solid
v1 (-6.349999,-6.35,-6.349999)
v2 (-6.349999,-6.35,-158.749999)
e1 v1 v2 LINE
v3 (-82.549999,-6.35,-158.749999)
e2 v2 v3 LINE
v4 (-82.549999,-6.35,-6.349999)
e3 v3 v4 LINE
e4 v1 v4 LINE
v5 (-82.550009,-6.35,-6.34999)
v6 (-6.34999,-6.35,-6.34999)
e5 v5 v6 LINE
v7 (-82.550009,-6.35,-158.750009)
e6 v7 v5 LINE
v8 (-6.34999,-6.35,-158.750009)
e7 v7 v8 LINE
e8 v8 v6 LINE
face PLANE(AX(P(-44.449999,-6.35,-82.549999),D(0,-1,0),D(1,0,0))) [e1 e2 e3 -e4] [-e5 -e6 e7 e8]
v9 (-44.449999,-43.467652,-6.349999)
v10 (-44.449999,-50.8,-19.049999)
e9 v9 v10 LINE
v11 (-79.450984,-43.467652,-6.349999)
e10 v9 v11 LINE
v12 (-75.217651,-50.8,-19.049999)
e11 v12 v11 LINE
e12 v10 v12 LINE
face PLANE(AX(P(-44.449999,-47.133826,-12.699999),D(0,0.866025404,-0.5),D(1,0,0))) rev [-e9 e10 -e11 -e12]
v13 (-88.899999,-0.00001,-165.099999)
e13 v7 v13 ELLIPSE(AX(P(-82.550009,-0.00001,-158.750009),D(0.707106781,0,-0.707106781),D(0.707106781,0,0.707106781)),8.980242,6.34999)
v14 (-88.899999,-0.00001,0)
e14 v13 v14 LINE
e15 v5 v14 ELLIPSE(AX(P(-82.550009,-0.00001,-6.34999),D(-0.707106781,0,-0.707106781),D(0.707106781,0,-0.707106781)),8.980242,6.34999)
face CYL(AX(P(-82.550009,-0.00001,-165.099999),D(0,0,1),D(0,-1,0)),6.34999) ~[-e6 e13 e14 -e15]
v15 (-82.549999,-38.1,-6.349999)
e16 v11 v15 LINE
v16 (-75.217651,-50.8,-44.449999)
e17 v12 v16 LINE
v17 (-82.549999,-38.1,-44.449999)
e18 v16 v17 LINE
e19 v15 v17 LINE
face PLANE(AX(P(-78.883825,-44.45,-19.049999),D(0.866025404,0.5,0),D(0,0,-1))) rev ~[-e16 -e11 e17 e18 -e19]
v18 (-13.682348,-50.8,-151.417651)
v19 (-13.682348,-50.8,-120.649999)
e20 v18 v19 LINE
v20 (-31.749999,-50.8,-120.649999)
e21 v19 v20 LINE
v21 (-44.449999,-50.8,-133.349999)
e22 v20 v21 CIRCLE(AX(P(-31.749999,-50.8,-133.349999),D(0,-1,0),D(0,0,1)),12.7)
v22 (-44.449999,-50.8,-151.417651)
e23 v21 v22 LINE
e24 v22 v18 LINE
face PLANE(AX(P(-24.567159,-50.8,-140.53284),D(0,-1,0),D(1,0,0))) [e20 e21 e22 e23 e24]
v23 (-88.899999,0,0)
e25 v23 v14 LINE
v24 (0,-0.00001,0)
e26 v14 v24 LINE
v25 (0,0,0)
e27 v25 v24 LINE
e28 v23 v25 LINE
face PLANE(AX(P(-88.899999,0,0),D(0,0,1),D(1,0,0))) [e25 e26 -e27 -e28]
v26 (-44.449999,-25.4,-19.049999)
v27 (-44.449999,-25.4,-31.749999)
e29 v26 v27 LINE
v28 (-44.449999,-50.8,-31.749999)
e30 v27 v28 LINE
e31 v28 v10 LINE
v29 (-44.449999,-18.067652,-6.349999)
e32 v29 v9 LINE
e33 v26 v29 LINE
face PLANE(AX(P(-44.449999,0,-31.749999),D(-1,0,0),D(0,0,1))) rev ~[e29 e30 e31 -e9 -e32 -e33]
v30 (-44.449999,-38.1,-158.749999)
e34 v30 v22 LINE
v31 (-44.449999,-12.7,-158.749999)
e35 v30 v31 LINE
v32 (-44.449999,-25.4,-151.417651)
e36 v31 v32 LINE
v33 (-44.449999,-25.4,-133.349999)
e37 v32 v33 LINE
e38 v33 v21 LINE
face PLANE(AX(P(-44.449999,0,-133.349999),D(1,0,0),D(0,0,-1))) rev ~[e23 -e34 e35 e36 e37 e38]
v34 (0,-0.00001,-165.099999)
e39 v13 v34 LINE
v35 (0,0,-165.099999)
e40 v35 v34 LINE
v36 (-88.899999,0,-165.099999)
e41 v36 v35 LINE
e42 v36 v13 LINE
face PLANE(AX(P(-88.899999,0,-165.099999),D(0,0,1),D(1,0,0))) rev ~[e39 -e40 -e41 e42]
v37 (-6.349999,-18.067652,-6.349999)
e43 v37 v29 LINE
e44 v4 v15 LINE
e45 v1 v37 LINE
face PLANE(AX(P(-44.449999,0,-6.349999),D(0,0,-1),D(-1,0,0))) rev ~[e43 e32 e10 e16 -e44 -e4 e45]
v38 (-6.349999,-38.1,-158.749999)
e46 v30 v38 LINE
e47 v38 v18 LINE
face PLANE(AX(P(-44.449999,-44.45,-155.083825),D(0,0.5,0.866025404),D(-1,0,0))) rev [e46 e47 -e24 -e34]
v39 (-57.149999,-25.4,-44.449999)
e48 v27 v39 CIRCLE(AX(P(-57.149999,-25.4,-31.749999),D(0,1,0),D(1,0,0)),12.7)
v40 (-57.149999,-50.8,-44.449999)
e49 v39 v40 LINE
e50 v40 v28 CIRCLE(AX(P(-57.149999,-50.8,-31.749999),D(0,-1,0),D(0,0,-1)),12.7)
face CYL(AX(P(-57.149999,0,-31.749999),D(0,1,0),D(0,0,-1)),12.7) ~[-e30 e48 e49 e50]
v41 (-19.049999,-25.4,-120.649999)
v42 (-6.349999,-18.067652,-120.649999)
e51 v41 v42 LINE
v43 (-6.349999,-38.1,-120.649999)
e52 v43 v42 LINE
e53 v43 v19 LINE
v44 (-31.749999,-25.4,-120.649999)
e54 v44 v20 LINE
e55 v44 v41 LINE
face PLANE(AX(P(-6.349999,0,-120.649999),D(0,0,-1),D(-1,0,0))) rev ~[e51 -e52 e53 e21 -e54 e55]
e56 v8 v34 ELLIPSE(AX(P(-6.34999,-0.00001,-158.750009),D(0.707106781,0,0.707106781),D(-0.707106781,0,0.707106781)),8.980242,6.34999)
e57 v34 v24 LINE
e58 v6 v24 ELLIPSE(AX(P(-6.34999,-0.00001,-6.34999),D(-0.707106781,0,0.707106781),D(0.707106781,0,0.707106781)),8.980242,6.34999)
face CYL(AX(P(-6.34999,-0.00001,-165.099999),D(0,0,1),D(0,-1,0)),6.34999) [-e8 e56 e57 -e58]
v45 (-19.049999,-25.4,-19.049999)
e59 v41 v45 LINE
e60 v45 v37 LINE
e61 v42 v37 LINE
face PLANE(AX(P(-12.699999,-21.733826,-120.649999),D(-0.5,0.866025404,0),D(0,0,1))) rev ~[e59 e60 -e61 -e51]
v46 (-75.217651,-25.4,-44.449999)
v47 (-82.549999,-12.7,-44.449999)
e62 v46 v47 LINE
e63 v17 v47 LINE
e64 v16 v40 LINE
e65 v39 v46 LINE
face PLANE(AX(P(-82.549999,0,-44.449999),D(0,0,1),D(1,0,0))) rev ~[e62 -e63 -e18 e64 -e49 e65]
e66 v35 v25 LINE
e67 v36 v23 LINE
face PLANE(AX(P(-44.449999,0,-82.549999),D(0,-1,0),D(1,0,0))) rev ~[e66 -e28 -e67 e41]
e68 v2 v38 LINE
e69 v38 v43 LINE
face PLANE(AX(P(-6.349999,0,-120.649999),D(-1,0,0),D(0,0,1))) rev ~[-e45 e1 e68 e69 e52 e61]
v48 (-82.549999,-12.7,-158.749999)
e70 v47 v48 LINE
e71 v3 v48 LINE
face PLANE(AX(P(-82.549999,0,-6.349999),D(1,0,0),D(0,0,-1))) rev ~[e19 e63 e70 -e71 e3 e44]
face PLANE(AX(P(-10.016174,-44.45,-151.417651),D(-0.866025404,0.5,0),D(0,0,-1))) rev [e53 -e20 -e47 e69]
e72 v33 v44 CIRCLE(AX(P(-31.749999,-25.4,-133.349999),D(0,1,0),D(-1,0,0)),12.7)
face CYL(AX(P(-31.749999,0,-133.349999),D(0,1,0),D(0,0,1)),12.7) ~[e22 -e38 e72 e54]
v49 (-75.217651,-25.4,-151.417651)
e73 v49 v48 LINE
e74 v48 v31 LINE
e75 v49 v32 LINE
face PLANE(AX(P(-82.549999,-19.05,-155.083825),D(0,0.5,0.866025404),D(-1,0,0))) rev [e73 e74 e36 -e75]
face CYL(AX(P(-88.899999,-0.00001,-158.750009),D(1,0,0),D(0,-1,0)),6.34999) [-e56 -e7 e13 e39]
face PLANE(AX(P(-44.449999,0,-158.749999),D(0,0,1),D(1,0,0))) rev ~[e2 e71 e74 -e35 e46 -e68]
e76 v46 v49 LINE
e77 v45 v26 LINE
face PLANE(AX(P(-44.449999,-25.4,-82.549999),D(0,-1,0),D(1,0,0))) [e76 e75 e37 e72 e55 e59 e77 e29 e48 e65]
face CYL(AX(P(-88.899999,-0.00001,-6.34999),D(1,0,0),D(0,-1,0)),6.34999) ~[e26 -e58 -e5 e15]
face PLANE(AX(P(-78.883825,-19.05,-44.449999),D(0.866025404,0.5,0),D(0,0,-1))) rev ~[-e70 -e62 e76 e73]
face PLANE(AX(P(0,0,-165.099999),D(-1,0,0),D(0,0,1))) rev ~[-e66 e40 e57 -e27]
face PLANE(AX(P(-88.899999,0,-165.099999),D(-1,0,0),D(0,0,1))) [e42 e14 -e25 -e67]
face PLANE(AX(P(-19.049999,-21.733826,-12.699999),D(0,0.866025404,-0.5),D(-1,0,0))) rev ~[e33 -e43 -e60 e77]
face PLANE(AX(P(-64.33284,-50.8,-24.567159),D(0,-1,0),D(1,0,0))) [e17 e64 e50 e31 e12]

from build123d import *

# Parameters (mm, degrees)
F0_W        = 88.8999989152
F0_H        = 165.0999989152
F1_DEPTH    = 6.35
F2_DEPTH    = 25.4
F3_DEPTH    = 50.8
F4_C1_SIZE2 = 7.3323484187
F4_C1_SIZE  = 12.7
F4_C2_SIZE2 = 7.3323484187
F4_C2_SIZE  = 12.7
F4_C3_SIZE2 = 7.3323484187
F4_C3_SIZE  = 12.7
F4_C4_SIZE2 = 12.7
F4_C4_SIZE  = 7.3323484187
F4_C5_SIZE2 = 7.3323484187
F4_C5_SIZE  = 12.7
F4_C6_SIZE2 = 7.3323484187
F4_C6_SIZE  = 12.7
F4_C7_SIZE2 = 12.7
F4_C7_SIZE  = 7.3323484187
F4_C8_SIZE2 = 12.7
F4_C8_SIZE  = 7.3323484187
F5_R        = 6.34999


# Not quite as in the source:
# - a fillet or chamfer is up to 0.001 mm smaller than in the source, because OpenCascade refuses the exact size


with BuildPart() as f1:
    # F0 (on Front) → F1 (new body)
    with BuildSketch(Plane.XZ):
        with Locations((-44.4499994576, -82.5499994576)):
            Rectangle(F0_W, F0_H)
        Polygon((-82.5499994576, -44.4499994576), (-82.5499994576, -6.3499994576), (-44.4499994576, -6.3499994576), (-6.3499994576, -6.3499994576), (-6.3499994576, -120.6499994576), (-6.3499994576, -158.7499994576), (-44.4499994576, -158.7499994576), (-82.5499994576, -158.7499994576), align=None, mode=Mode.SUBTRACT)
    extrude(amount=F1_DEPTH)

    # F0 (on Front) → F2 (join)
    with BuildSketch(Plane.XZ):
        with BuildLine():
            Line((-57.1499994576, -44.4499994576), (-82.5499994576, -44.4499994576))
            Line((-82.5499994576, -44.4499994576), (-82.5499994576, -158.7499994576))
            Line((-82.5499994576, -158.7499994576), (-44.4499994576, -158.7499994576))
            Line((-44.4499994576, -158.7499994576), (-44.4499994576, -133.3499994576))
            ThreePointArc((-44.4499994576, -133.3499994576), (-40.7302555787, -124.3697433365), (-31.7499994576, -120.6499994576))
            Line((-31.7499994576, -120.6499994576), (-6.3499994576, -120.6499994576))
            Line((-6.3499994576, -120.6499994576), (-6.3499994576, -6.3499994576))
            Line((-6.3499994576, -6.3499994576), (-44.4499994576, -6.3499994576))
            Line((-44.4499994576, -6.3499994576), (-44.4499994576, -31.7499994576))
            ThreePointArc((-44.4499994576, -31.7499994576), (-48.1697433365, -40.7302555787), (-57.1499994576, -44.4499994576))
        make_face()
    extrude(amount=F2_DEPTH)

    # F0 (on Front) → F3 (join)
    with BuildSketch(Plane.XZ):
        with BuildLine():
            Line((-44.4499994576, -6.3499994576), (-82.5499994576, -6.3499994576))
            Line((-82.5499994576, -6.3499994576), (-82.5499994576, -44.4499994576))
            Line((-82.5499994576, -44.4499994576), (-57.1499994576, -44.4499994576))
            ThreePointArc((-57.1499994576, -44.4499994576), (-48.1697433365, -40.7302555787), (-44.4499994576, -31.7499994576))
            Line((-44.4499994576, -31.7499994576), (-44.4499994576, -6.3499994576))
        make_face()
        with BuildLine():
            Line((-44.4499994576, -133.3499994576), (-44.4499994576, -158.7499994576))
            Line((-44.4499994576, -158.7499994576), (-6.3499994576, -158.7499994576))
            Line((-6.3499994576, -158.7499994576), (-6.3499994576, -120.6499994576))
            Line((-6.3499994576, -120.6499994576), (-31.7499994576, -120.6499994576))
            ThreePointArc((-31.7499994576, -120.6499994576), (-40.7302555787, -124.3697433365), (-44.4499994576, -133.3499994576))
        make_face()
    extrude(amount=F3_DEPTH)

    # F4: chamfer of 12.7 x 7.3323484187 on 8 edges, made by hand

    # F4_c1
    f4_c1_edges = [f1.edges().sort_by_distance(p)[0] for p in [
        (-63.4999994576, -25.4, -158.7499994576),
    ]]
    f4_c1_side = f1.faces().sort_by_distance((-63.4999994576, -25.2533530316, -158.7499994576))[0]
    chamfer(f4_c1_edges, length=F4_C1_SIZE, length2=F4_C1_SIZE2, reference=f4_c1_side)

    # F4_c2
    f4_c2_edges = [f1.edges().sort_by_distance(p)[0] for p in [
        (-25.3999994576, -50.8, -158.7499994576),
    ]]
    f4_c2_side = f1.faces().sort_by_distance((-25.3999994576, -50.6533530316, -158.7499994576))[0]
    chamfer(f4_c2_edges, length=F4_C2_SIZE, length2=F4_C2_SIZE2, reference=f4_c2_side)

    # F4_c3
    f4_c3_edges = [f1.edges().sort_by_distance(p)[0] for p in [
        (-6.3499994576, -50.8, -136.0338252482),
    ]]
    f4_c3_side = f1.faces().sort_by_distance((-6.3499994576, -50.6533530316, -136.0338252482))[0]
    chamfer(f4_c3_edges, length=F4_C3_SIZE, length2=F4_C3_SIZE2, reference=f4_c3_side)

    # F4_c4
    f4_c4_edges = [f1.edges().sort_by_distance(p)[0] for p in [
        (-82.5499994576, -25.4, -97.9338252482),
    ]]
    f4_c4_side = f1.faces().sort_by_distance((-82.4033524892, -25.4, -97.9338252482))[0]
    chamfer(f4_c4_edges, length=F4_C4_SIZE, length2=F4_C4_SIZE2, reference=f4_c4_side)

    # F4_c5
    f4_c5_edges = [f1.edges().sort_by_distance(p)[0] for p in [
        (-6.3499994576, -25.4, -63.4999994576),
    ]]
    f4_c5_side = f1.faces().sort_by_distance((-6.496646426, -25.4, -63.4999994576))[0]
    chamfer(f4_c5_edges, length=F4_C5_SIZE, length2=F4_C5_SIZE2, reference=f4_c5_side)

    # F4_c6
    f4_c6_edges = [f1.edges().sort_by_distance(p)[0] for p in [
        (-31.7499994576, -25.4, -6.3499994576),
    ]]
    f4_c6_side = f1.faces().sort_by_distance((-31.7499994576, -25.4, -6.496646426))[0]
    chamfer(f4_c6_edges, length=F4_C6_SIZE, length2=F4_C6_SIZE2, reference=f4_c6_side)

    # F4_c7
    f4_c7_edges = [f1.edges().sort_by_distance(p)[0] for p in [
        (-63.4999994576, -50.8, -6.3499994576),
    ]]
    f4_c7_side = f1.faces().sort_by_distance((-63.4999994576, -50.6533530316, -6.3499994576))[0]
    chamfer(f4_c7_edges, length=F4_C7_SIZE, length2=F4_C7_SIZE2, reference=f4_c7_side)

    # F4_c8
    f4_c8_edges = [f1.edges().sort_by_distance(p)[0] for p in [
        (-82.5499994576, -50.8, -31.7499994576),
    ]]
    f4_c8_side = f1.faces().sort_by_distance((-82.4033524892, -50.8, -31.7499994576))[0]
    chamfer(f4_c8_edges, length=F4_C8_SIZE, length2=F4_C8_SIZE2, reference=f4_c8_side)

    # F5 (radius 6.35 in the source; OpenCascade refuses exactly that, so slightly less here)
    f5_edges = [f1.edges().sort_by_distance(p)[0] for p in [
        (-44.449999, -6.35, 0),
        (-88.899999, -6.35, -82.549999),
        (0, -6.35, -82.549999),
        (-44.449999, -6.35, -165.099999),
    ]]
    fillet(f5_edges, radius=F5_R)


solid = f1.part
